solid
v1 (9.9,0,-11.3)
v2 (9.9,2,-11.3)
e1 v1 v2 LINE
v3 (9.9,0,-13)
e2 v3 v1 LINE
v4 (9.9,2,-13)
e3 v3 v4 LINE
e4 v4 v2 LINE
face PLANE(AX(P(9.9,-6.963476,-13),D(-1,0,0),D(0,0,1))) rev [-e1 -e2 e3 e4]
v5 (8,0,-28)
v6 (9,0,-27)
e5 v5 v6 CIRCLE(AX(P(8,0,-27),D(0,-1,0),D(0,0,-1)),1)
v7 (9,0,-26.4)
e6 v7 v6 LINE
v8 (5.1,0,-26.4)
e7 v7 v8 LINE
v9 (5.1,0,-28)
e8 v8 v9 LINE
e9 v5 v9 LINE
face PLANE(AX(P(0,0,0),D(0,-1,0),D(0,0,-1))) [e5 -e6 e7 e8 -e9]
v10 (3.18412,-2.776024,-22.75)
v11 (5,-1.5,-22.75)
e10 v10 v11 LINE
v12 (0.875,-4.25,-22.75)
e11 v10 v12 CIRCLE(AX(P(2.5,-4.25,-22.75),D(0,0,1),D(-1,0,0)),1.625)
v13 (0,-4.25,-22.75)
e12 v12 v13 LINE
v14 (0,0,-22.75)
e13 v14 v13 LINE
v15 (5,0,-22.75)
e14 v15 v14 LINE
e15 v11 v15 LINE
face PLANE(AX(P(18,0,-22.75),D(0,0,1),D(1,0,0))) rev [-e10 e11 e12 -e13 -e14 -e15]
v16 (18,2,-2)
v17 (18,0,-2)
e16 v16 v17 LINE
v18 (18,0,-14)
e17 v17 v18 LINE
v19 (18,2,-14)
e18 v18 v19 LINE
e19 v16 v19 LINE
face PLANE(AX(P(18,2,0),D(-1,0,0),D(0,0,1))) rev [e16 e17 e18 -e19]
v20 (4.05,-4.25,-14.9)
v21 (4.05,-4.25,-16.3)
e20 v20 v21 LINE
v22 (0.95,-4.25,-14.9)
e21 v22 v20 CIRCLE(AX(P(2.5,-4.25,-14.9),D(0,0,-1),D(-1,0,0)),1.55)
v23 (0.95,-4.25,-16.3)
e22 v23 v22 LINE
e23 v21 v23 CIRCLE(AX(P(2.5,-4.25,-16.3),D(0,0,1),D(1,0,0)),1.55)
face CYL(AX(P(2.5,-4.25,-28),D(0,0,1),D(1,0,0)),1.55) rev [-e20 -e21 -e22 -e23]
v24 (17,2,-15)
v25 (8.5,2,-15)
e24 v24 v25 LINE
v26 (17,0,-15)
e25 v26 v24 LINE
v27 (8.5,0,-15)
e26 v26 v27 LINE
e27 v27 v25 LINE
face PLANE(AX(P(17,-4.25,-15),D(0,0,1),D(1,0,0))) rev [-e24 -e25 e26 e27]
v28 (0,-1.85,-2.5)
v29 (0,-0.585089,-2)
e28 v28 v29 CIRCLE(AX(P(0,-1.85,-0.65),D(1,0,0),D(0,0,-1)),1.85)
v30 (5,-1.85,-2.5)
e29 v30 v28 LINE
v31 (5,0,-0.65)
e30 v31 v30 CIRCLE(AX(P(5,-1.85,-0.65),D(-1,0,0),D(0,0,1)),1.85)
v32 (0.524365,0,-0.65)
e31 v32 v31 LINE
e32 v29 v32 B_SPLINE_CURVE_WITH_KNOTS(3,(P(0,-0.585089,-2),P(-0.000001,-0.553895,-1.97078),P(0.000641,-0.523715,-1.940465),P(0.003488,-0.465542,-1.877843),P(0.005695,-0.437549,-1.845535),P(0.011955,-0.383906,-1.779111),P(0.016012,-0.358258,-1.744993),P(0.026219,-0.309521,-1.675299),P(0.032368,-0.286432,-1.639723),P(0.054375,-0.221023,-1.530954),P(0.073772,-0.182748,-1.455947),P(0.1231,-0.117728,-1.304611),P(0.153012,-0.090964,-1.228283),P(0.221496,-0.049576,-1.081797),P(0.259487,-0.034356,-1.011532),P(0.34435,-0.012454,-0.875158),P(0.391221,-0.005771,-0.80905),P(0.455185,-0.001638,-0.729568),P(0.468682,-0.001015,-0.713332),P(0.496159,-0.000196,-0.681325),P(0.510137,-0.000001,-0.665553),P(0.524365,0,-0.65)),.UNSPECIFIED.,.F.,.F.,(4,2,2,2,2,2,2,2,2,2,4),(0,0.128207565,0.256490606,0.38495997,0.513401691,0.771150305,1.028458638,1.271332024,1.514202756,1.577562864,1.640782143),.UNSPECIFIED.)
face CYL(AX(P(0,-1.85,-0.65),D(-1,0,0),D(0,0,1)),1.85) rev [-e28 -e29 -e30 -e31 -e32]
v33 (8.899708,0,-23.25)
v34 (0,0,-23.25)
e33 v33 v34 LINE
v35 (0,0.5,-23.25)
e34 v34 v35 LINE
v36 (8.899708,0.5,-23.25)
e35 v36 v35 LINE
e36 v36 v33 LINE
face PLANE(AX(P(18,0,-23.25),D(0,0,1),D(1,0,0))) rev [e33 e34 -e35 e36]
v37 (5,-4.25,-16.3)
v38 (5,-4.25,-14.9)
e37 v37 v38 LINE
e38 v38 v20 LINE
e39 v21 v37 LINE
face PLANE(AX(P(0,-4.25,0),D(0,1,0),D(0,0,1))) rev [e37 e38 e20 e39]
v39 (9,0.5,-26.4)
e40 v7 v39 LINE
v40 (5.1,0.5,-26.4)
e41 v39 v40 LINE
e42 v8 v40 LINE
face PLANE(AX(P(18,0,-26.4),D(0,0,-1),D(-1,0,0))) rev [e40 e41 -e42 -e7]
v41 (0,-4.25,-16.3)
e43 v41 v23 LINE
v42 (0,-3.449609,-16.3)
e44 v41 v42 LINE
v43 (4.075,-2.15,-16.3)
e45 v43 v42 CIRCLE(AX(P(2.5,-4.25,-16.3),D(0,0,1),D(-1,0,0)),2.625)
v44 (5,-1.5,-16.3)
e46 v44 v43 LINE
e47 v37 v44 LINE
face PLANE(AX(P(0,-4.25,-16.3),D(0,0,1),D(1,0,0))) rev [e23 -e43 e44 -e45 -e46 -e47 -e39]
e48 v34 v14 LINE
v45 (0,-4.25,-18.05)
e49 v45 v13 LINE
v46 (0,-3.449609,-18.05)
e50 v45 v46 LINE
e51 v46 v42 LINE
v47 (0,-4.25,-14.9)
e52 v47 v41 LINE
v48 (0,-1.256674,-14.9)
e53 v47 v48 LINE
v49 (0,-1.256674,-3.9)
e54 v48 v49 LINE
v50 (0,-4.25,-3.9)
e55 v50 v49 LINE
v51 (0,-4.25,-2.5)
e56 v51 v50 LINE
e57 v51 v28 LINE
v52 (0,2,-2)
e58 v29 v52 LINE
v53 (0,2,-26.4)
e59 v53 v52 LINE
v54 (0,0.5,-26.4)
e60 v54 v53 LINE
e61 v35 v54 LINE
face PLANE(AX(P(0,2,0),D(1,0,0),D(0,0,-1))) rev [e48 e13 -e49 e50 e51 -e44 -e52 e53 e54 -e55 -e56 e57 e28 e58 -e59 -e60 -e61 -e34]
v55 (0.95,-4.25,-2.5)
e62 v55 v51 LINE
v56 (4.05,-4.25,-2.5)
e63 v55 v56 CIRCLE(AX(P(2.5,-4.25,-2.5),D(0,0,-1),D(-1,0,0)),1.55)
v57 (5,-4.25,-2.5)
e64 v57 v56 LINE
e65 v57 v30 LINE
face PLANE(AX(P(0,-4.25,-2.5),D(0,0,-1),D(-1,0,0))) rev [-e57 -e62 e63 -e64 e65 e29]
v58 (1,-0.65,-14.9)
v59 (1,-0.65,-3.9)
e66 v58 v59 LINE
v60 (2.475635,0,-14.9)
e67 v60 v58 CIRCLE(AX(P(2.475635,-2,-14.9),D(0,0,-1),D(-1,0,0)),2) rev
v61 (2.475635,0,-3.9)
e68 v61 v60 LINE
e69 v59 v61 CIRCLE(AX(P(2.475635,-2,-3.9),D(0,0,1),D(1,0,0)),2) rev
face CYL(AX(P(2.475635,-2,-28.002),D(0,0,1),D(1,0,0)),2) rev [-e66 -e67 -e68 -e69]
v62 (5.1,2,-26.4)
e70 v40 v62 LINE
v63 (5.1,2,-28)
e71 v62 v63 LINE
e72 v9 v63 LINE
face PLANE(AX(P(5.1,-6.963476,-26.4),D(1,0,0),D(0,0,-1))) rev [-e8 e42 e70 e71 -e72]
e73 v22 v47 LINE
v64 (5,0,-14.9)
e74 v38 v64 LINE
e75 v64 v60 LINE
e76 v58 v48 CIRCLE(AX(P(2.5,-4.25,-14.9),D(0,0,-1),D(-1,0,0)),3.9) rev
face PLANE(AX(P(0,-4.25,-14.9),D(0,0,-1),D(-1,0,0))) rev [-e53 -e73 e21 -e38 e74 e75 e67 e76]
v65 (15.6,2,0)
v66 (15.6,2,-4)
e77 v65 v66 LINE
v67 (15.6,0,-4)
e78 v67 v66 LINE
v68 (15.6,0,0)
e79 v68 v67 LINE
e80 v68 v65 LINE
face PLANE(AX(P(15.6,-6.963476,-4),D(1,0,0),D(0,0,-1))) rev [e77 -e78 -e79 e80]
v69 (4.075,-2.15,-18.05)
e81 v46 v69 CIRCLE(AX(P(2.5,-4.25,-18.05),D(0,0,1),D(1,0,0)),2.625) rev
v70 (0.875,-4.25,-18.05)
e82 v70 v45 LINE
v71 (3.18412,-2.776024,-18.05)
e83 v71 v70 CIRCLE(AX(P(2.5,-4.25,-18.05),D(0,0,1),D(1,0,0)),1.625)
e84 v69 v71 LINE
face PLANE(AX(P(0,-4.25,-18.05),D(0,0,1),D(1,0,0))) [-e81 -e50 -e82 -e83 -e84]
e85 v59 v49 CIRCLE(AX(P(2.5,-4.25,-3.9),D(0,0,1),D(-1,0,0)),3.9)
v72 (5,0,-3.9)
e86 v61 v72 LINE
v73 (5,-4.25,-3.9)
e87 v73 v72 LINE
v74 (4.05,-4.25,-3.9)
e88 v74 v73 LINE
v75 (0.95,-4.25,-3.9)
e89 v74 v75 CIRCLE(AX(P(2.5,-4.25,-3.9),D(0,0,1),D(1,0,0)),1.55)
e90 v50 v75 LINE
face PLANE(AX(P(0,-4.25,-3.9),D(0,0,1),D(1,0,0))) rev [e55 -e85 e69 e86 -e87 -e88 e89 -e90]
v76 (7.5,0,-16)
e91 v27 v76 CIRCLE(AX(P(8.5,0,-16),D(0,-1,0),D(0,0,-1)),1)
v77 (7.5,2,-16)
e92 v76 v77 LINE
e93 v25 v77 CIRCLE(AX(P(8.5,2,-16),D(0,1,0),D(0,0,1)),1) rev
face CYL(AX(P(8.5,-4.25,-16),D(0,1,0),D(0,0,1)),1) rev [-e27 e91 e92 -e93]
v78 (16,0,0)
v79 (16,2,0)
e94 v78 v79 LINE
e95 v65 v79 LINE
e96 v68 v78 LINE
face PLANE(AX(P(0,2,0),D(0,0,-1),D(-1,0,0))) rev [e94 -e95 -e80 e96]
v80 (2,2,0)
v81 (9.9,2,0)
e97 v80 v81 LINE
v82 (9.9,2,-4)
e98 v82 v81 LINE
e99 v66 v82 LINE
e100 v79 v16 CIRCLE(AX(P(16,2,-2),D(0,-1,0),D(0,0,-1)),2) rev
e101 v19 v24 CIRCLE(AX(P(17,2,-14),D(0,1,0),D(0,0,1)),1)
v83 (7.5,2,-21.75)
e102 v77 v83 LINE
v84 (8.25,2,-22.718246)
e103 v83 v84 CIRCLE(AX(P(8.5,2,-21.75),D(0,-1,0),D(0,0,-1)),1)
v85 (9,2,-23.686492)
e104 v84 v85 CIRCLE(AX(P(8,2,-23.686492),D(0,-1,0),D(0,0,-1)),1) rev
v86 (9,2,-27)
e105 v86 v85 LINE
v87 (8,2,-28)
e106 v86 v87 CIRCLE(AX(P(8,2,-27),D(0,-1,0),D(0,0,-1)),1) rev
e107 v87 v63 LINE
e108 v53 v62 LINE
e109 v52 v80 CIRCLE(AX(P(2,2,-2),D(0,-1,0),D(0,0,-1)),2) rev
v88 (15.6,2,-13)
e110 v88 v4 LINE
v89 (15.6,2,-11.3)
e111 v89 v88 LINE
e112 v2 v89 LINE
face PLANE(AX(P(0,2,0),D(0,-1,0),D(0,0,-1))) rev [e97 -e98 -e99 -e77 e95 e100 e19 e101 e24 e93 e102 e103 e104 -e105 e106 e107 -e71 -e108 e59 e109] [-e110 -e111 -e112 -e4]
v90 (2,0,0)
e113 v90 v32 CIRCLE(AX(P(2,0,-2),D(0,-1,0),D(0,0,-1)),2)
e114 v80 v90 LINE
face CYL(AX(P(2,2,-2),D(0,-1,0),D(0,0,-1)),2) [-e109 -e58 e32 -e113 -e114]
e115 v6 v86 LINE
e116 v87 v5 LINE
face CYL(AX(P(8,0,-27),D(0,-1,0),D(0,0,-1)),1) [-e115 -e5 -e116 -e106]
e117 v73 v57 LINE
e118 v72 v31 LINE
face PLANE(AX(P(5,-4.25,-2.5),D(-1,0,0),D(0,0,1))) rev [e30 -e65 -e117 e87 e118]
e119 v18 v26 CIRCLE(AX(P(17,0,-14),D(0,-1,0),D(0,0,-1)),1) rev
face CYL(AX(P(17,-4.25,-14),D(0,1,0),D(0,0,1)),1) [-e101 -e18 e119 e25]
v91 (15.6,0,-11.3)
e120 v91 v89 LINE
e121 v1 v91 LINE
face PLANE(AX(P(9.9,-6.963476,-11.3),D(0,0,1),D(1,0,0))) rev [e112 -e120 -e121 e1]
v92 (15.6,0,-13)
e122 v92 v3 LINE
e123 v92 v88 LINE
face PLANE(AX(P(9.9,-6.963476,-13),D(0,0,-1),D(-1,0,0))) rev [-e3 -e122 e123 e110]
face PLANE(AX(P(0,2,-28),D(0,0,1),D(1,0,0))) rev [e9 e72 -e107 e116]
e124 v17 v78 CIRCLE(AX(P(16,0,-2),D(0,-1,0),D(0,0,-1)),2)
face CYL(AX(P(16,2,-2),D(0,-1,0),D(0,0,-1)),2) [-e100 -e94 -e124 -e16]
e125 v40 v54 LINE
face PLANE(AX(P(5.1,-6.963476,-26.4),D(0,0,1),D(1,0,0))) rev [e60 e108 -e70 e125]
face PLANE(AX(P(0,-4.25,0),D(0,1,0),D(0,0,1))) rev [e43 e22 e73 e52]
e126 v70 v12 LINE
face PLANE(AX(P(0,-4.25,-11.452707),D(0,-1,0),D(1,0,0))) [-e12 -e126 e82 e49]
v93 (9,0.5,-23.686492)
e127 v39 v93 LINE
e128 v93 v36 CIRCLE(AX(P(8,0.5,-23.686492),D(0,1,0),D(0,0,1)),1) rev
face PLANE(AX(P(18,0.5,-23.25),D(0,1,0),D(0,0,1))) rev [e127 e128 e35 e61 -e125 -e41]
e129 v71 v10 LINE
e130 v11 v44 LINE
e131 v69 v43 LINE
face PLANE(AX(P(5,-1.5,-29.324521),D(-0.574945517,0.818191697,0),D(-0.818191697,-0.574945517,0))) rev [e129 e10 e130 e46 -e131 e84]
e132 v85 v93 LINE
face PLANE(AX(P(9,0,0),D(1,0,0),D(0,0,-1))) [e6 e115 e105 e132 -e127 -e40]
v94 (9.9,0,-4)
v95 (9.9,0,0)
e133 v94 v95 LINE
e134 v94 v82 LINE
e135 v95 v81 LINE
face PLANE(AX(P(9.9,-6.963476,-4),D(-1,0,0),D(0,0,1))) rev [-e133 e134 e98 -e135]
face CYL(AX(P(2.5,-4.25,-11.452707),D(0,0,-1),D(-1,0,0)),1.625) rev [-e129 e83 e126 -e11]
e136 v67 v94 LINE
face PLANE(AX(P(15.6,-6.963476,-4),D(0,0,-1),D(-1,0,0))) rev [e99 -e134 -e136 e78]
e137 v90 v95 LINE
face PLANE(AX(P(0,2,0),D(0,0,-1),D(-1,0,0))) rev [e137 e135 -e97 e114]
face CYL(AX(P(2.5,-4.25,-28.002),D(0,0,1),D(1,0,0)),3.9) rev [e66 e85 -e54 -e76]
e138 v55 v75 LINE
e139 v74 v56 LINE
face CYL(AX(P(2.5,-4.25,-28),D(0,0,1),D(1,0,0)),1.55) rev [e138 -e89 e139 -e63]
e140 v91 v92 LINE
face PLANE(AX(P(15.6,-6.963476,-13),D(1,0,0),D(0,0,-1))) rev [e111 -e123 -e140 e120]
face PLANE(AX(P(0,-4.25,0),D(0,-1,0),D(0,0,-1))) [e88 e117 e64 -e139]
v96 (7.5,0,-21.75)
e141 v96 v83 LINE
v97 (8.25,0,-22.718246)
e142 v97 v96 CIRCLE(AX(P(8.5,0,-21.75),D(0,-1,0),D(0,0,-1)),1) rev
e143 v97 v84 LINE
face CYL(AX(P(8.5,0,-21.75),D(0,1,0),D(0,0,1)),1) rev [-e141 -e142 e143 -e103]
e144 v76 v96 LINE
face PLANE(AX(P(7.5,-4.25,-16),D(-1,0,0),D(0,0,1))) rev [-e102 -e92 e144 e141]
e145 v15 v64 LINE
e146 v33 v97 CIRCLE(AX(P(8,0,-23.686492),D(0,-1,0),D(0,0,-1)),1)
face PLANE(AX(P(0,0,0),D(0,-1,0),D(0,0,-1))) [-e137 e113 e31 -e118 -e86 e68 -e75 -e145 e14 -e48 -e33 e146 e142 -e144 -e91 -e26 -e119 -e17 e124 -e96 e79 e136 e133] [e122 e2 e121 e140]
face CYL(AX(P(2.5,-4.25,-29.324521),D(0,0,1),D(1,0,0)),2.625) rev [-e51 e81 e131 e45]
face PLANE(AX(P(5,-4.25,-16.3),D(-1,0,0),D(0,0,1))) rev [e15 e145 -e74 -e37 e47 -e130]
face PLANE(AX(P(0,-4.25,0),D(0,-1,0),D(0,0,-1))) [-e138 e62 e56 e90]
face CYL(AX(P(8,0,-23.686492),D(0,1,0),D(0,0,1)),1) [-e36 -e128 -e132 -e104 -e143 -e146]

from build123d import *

# Parameters (mm, degrees)
SKETCH1_W               = 18
SKETCH1_H               = 28
BOSS_EXTRUDE1_DEPTH     = 2
SKETCH2_W               = 5
SKETCH2_H               = 1.4
BOSS_EXTRUDE2_DEPTH     = 4.25
CUT_EXTRUDE1_DEPTH      = 34.556854739
CUT_EXTRUDE1_DEPTH_BACK = 34.556854739
SKETCH4_R               = 1.55
FILLET1_R               = 2
SKETCH5_W               = 5.7
SKETCH5_H               = 1.7
SKETCH5_H_2             = 4
SKETCH5_W_2             = 5.1
SKETCH5_H_3             = 1.6
CUT_EXTRUDE2_DEPTH      = 2
CUT_EXTRUDE3_DEPTH      = 34.868311148
CUT_EXTRUDE3_DEPTH_BACK = 34.868311148
FILLET2_R               = 2
SKETCH8_W               = 5.25
SKETCH8_H               = 2
BOSS_EXTRUDE3_DEPTH     = 1.5
FILLET3_R               = 1
FILLET4_R               = 1
SKETCH7_W               = 3.15
SKETCH7_H               = 0.5
CUT_EXTRUDE4_DEPTH      = 34.556854876
BOSS_EXTRUDE4_REACH     = 32.379
BOSS_EXTRUDE6_DEPTH     = 6.45
BOSS_EXTRUDE7_START     = -4.7
BOSS_EXTRUDE7_DEPTH     = 4.7
FILLET7_R               = 2
FILLET8_R               = 1.85


with BuildPart() as part:
    # Sketch1 → Boss-Extrude1 (new body)
    with BuildSketch(Plane(origin=(0, 0, 0), x_dir=(1, 0, 0), z_dir=(0, 1, 0))):
        with Locations((9, 14)):
            Rectangle(SKETCH1_W, SKETCH1_H)
    extrude(amount=BOSS_EXTRUDE1_DEPTH)

    # Sketch2 → Boss-Extrude2 (add)
    with BuildSketch(Plane.XZ):
        with Locations((2.5, -3.2)):
            Rectangle(SKETCH2_W, SKETCH2_H)
        with Locations((2.5, -15.6)):
            Rectangle(SKETCH2_W, SKETCH2_H)
    extrude(amount=BOSS_EXTRUDE2_DEPTH)

    # Sketch4 → Cut-Extrude1 (cut, two sides: drawn at the far end of the back side and taken through both)
    with BuildSketch(Plane.XY.offset(-CUT_EXTRUDE1_DEPTH_BACK)):
        with Locations((2.5, -4.25)):
            Circle(SKETCH4_R)
    extrude(amount=CUT_EXTRUDE1_DEPTH + CUT_EXTRUDE1_DEPTH_BACK, mode=Mode.SUBTRACT)

    # Fillet1
    fillet1_edges = [part.edges().sort_by_distance(p)[0] for p in [
        (0, 1, 0),
    ]]
    fillet(fillet1_edges, radius=FILLET1_R)

    # Sketch5 → Cut-Extrude2 (cut)
    with BuildSketch(Plane(origin=(0, 2, 0), x_dir=(1, 0, 0), z_dir=(0, 1, 0))):
        with Locations((12.75, 12.15)):
            Rectangle(SKETCH5_W, SKETCH5_H)
        with Locations((12.75, 2)):
            Rectangle(SKETCH5_W, SKETCH5_H_2)
        with Locations((2.55, 27.2)):
            Rectangle(SKETCH5_W_2, SKETCH5_H_3)
    extrude(amount=-CUT_EXTRUDE2_DEPTH, mode=Mode.SUBTRACT)

    # Sketch6 → Cut-Extrude3 (cut, two sides: drawn at the far end of the back side and taken through both)
    with BuildSketch(Plane(origin=(0, 2, 0), x_dir=(1, 0, 0), z_dir=(0, 1, 0)).offset(-CUT_EXTRUDE3_DEPTH_BACK)):
        with BuildLine():
            Line((18, 14), (20.5, 14))
            Line((20.5, 14), (20.5, 30.5))
            Line((20.5, 30.5), (7.5, 30.5))
            Line((7.5, 30.5), (7.5, 28))
            Line((7.5, 28), (7.5, 16))
            ThreePointArc((7.5, 16), (7.792893219, 15.292893219), (8.5, 15))
            Line((8.5, 15), (17, 15))
            ThreePointArc((17, 15), (17.707106781, 14.707106781), (18, 14))
        make_face()
    extrude(amount=CUT_EXTRUDE3_DEPTH + CUT_EXTRUDE3_DEPTH_BACK, mode=Mode.SUBTRACT)

    # Fillet2
    fillet2_edges = [part.edges().sort_by_distance(p)[0] for p in [
        (18, 1, 0),
    ]]
    fillet(fillet2_edges, radius=FILLET2_R)

    # Sketch8 → Boss-Extrude3 (add)
    with BuildSketch(Plane(origin=(7.5, 0, 0), x_dir=(0, 0, -1), z_dir=(1, 0, 0))):
        with Locations((25.375, 1)):
            Rectangle(SKETCH8_W, SKETCH8_H)
    extrude(amount=BOSS_EXTRUDE3_DEPTH)

    # Fillet3
    fillet3_edges = [part.edges().sort_by_distance(p)[0] for p in [
        (7.5, 1, -22.75),
        (9, 1, -28),
    ]]
    fillet(fillet3_edges, radius=FILLET3_R)

    # Fillet4
    fillet4_edges = [part.edges().sort_by_distance(p)[0] for p in [
        (9, 1, -22.75),
    ]]
    fillet(fillet4_edges, radius=FILLET4_R)

    # Sketch7 → Cut-Extrude4 (cut, through all)
    with BuildSketch(Plane.ZY):
        with Locations((-24.825, 0.25)):
            Rectangle(SKETCH7_W, SKETCH7_H)
    extrude(amount=-CUT_EXTRUDE4_DEPTH, mode=Mode.SUBTRACT)

    # Sketch9 → Boss-Extrude4 (add, up to next)
    with BuildSketch(Plane(origin=(0, 0, -3.9), x_dir=(-1, 0, 0), z_dir=(0, 0, -1)), mode=Mode.PRIVATE) as boss_extrude4_sk1:
        with BuildLine():
            Line((0, 0), (-1, 0))
            Line((-1, 0), (-1, -0.65))
            ThreePointArc((-1, -0.65), (-0.477127448, -0.915635497), (0, -1.256674091))
            Line((0, -1.256674091), (0, 0))
        make_face()
    boss_extrude4_tool1 = extrude(boss_extrude4_sk1.sketch, amount=BOSS_EXTRUDE4_REACH, mode=Mode.PRIVATE) - part.part
    add(boss_extrude4_tool1.solids().sort_by_distance((0.445326, -0.476066, -3.9))[0])

    # Sketch10 → Boss-Extrude6 (add)
    with BuildSketch(Plane(origin=(0, 0, -16.3), x_dir=(-1, 0, 0), z_dir=(0, 0, -1))):
        with BuildLine():
            Line((-5, -1.5), (-4.075, -2.15))
            ThreePointArc((-4.075, -2.15), (-1.702408348, -1.749105649), (0, -3.44960947))
            Line((0, -3.44960947), (0, 0))
            Line((0, 0), (-5, 0))
            Line((-5, 0), (-5, -1.5))
        make_face()
    extrude(amount=BOSS_EXTRUDE6_DEPTH)

    # Sketch11 → Boss-Extrude7 (add)
    with BuildSketch(Plane(origin=(0, 0, -22.75), x_dir=(-1, 0, 0), z_dir=(0, 0, -1)).offset(BOSS_EXTRUDE7_START)):
        with BuildLine():
            Line((-4.075, -2.15), (-3.184119692, -2.776024))
            ThreePointArc((-3.184119692, -2.776024), (-1.625662965, -2.880270191), (-0.875, -4.25))
            Line((-0.875, -4.25), (0, -4.25))
            Line((0, -4.25), (0, -3.44960947))
            ThreePointArc((0, -3.44960947), (-1.702408348, -1.749105649), (-4.075, -2.15))
        make_face()
    extrude(amount=BOSS_EXTRUDE7_DEPTH)

    # Fillet7
    # the kernel refuses this fillet: 2 mm, written as the material it adds along each edge
    with BuildSketch(Plane(origin=(1, 0, -3.9), x_dir=(1, 0, 0), z_dir=(0, 0, -1))) as fillet7_piece_1:
        with BuildLine():
            CenterArc((1.475635456, 2), FILLET7_R, 222.454150204, 47.545849796)
            Line((0, 0.65), (0, 0))
            Line((0, 0), (1.475635456, 0))
        make_face()
    extrude(amount=14.689088641)

    # Fillet8
    fillet8_edges = [part.edges().sort_by_distance(p)[0] for p in [
        (2.5, 0, -2.5),
    ]]
    fillet(fillet8_edges, radius=FILLET8_R)


solid = part.part
